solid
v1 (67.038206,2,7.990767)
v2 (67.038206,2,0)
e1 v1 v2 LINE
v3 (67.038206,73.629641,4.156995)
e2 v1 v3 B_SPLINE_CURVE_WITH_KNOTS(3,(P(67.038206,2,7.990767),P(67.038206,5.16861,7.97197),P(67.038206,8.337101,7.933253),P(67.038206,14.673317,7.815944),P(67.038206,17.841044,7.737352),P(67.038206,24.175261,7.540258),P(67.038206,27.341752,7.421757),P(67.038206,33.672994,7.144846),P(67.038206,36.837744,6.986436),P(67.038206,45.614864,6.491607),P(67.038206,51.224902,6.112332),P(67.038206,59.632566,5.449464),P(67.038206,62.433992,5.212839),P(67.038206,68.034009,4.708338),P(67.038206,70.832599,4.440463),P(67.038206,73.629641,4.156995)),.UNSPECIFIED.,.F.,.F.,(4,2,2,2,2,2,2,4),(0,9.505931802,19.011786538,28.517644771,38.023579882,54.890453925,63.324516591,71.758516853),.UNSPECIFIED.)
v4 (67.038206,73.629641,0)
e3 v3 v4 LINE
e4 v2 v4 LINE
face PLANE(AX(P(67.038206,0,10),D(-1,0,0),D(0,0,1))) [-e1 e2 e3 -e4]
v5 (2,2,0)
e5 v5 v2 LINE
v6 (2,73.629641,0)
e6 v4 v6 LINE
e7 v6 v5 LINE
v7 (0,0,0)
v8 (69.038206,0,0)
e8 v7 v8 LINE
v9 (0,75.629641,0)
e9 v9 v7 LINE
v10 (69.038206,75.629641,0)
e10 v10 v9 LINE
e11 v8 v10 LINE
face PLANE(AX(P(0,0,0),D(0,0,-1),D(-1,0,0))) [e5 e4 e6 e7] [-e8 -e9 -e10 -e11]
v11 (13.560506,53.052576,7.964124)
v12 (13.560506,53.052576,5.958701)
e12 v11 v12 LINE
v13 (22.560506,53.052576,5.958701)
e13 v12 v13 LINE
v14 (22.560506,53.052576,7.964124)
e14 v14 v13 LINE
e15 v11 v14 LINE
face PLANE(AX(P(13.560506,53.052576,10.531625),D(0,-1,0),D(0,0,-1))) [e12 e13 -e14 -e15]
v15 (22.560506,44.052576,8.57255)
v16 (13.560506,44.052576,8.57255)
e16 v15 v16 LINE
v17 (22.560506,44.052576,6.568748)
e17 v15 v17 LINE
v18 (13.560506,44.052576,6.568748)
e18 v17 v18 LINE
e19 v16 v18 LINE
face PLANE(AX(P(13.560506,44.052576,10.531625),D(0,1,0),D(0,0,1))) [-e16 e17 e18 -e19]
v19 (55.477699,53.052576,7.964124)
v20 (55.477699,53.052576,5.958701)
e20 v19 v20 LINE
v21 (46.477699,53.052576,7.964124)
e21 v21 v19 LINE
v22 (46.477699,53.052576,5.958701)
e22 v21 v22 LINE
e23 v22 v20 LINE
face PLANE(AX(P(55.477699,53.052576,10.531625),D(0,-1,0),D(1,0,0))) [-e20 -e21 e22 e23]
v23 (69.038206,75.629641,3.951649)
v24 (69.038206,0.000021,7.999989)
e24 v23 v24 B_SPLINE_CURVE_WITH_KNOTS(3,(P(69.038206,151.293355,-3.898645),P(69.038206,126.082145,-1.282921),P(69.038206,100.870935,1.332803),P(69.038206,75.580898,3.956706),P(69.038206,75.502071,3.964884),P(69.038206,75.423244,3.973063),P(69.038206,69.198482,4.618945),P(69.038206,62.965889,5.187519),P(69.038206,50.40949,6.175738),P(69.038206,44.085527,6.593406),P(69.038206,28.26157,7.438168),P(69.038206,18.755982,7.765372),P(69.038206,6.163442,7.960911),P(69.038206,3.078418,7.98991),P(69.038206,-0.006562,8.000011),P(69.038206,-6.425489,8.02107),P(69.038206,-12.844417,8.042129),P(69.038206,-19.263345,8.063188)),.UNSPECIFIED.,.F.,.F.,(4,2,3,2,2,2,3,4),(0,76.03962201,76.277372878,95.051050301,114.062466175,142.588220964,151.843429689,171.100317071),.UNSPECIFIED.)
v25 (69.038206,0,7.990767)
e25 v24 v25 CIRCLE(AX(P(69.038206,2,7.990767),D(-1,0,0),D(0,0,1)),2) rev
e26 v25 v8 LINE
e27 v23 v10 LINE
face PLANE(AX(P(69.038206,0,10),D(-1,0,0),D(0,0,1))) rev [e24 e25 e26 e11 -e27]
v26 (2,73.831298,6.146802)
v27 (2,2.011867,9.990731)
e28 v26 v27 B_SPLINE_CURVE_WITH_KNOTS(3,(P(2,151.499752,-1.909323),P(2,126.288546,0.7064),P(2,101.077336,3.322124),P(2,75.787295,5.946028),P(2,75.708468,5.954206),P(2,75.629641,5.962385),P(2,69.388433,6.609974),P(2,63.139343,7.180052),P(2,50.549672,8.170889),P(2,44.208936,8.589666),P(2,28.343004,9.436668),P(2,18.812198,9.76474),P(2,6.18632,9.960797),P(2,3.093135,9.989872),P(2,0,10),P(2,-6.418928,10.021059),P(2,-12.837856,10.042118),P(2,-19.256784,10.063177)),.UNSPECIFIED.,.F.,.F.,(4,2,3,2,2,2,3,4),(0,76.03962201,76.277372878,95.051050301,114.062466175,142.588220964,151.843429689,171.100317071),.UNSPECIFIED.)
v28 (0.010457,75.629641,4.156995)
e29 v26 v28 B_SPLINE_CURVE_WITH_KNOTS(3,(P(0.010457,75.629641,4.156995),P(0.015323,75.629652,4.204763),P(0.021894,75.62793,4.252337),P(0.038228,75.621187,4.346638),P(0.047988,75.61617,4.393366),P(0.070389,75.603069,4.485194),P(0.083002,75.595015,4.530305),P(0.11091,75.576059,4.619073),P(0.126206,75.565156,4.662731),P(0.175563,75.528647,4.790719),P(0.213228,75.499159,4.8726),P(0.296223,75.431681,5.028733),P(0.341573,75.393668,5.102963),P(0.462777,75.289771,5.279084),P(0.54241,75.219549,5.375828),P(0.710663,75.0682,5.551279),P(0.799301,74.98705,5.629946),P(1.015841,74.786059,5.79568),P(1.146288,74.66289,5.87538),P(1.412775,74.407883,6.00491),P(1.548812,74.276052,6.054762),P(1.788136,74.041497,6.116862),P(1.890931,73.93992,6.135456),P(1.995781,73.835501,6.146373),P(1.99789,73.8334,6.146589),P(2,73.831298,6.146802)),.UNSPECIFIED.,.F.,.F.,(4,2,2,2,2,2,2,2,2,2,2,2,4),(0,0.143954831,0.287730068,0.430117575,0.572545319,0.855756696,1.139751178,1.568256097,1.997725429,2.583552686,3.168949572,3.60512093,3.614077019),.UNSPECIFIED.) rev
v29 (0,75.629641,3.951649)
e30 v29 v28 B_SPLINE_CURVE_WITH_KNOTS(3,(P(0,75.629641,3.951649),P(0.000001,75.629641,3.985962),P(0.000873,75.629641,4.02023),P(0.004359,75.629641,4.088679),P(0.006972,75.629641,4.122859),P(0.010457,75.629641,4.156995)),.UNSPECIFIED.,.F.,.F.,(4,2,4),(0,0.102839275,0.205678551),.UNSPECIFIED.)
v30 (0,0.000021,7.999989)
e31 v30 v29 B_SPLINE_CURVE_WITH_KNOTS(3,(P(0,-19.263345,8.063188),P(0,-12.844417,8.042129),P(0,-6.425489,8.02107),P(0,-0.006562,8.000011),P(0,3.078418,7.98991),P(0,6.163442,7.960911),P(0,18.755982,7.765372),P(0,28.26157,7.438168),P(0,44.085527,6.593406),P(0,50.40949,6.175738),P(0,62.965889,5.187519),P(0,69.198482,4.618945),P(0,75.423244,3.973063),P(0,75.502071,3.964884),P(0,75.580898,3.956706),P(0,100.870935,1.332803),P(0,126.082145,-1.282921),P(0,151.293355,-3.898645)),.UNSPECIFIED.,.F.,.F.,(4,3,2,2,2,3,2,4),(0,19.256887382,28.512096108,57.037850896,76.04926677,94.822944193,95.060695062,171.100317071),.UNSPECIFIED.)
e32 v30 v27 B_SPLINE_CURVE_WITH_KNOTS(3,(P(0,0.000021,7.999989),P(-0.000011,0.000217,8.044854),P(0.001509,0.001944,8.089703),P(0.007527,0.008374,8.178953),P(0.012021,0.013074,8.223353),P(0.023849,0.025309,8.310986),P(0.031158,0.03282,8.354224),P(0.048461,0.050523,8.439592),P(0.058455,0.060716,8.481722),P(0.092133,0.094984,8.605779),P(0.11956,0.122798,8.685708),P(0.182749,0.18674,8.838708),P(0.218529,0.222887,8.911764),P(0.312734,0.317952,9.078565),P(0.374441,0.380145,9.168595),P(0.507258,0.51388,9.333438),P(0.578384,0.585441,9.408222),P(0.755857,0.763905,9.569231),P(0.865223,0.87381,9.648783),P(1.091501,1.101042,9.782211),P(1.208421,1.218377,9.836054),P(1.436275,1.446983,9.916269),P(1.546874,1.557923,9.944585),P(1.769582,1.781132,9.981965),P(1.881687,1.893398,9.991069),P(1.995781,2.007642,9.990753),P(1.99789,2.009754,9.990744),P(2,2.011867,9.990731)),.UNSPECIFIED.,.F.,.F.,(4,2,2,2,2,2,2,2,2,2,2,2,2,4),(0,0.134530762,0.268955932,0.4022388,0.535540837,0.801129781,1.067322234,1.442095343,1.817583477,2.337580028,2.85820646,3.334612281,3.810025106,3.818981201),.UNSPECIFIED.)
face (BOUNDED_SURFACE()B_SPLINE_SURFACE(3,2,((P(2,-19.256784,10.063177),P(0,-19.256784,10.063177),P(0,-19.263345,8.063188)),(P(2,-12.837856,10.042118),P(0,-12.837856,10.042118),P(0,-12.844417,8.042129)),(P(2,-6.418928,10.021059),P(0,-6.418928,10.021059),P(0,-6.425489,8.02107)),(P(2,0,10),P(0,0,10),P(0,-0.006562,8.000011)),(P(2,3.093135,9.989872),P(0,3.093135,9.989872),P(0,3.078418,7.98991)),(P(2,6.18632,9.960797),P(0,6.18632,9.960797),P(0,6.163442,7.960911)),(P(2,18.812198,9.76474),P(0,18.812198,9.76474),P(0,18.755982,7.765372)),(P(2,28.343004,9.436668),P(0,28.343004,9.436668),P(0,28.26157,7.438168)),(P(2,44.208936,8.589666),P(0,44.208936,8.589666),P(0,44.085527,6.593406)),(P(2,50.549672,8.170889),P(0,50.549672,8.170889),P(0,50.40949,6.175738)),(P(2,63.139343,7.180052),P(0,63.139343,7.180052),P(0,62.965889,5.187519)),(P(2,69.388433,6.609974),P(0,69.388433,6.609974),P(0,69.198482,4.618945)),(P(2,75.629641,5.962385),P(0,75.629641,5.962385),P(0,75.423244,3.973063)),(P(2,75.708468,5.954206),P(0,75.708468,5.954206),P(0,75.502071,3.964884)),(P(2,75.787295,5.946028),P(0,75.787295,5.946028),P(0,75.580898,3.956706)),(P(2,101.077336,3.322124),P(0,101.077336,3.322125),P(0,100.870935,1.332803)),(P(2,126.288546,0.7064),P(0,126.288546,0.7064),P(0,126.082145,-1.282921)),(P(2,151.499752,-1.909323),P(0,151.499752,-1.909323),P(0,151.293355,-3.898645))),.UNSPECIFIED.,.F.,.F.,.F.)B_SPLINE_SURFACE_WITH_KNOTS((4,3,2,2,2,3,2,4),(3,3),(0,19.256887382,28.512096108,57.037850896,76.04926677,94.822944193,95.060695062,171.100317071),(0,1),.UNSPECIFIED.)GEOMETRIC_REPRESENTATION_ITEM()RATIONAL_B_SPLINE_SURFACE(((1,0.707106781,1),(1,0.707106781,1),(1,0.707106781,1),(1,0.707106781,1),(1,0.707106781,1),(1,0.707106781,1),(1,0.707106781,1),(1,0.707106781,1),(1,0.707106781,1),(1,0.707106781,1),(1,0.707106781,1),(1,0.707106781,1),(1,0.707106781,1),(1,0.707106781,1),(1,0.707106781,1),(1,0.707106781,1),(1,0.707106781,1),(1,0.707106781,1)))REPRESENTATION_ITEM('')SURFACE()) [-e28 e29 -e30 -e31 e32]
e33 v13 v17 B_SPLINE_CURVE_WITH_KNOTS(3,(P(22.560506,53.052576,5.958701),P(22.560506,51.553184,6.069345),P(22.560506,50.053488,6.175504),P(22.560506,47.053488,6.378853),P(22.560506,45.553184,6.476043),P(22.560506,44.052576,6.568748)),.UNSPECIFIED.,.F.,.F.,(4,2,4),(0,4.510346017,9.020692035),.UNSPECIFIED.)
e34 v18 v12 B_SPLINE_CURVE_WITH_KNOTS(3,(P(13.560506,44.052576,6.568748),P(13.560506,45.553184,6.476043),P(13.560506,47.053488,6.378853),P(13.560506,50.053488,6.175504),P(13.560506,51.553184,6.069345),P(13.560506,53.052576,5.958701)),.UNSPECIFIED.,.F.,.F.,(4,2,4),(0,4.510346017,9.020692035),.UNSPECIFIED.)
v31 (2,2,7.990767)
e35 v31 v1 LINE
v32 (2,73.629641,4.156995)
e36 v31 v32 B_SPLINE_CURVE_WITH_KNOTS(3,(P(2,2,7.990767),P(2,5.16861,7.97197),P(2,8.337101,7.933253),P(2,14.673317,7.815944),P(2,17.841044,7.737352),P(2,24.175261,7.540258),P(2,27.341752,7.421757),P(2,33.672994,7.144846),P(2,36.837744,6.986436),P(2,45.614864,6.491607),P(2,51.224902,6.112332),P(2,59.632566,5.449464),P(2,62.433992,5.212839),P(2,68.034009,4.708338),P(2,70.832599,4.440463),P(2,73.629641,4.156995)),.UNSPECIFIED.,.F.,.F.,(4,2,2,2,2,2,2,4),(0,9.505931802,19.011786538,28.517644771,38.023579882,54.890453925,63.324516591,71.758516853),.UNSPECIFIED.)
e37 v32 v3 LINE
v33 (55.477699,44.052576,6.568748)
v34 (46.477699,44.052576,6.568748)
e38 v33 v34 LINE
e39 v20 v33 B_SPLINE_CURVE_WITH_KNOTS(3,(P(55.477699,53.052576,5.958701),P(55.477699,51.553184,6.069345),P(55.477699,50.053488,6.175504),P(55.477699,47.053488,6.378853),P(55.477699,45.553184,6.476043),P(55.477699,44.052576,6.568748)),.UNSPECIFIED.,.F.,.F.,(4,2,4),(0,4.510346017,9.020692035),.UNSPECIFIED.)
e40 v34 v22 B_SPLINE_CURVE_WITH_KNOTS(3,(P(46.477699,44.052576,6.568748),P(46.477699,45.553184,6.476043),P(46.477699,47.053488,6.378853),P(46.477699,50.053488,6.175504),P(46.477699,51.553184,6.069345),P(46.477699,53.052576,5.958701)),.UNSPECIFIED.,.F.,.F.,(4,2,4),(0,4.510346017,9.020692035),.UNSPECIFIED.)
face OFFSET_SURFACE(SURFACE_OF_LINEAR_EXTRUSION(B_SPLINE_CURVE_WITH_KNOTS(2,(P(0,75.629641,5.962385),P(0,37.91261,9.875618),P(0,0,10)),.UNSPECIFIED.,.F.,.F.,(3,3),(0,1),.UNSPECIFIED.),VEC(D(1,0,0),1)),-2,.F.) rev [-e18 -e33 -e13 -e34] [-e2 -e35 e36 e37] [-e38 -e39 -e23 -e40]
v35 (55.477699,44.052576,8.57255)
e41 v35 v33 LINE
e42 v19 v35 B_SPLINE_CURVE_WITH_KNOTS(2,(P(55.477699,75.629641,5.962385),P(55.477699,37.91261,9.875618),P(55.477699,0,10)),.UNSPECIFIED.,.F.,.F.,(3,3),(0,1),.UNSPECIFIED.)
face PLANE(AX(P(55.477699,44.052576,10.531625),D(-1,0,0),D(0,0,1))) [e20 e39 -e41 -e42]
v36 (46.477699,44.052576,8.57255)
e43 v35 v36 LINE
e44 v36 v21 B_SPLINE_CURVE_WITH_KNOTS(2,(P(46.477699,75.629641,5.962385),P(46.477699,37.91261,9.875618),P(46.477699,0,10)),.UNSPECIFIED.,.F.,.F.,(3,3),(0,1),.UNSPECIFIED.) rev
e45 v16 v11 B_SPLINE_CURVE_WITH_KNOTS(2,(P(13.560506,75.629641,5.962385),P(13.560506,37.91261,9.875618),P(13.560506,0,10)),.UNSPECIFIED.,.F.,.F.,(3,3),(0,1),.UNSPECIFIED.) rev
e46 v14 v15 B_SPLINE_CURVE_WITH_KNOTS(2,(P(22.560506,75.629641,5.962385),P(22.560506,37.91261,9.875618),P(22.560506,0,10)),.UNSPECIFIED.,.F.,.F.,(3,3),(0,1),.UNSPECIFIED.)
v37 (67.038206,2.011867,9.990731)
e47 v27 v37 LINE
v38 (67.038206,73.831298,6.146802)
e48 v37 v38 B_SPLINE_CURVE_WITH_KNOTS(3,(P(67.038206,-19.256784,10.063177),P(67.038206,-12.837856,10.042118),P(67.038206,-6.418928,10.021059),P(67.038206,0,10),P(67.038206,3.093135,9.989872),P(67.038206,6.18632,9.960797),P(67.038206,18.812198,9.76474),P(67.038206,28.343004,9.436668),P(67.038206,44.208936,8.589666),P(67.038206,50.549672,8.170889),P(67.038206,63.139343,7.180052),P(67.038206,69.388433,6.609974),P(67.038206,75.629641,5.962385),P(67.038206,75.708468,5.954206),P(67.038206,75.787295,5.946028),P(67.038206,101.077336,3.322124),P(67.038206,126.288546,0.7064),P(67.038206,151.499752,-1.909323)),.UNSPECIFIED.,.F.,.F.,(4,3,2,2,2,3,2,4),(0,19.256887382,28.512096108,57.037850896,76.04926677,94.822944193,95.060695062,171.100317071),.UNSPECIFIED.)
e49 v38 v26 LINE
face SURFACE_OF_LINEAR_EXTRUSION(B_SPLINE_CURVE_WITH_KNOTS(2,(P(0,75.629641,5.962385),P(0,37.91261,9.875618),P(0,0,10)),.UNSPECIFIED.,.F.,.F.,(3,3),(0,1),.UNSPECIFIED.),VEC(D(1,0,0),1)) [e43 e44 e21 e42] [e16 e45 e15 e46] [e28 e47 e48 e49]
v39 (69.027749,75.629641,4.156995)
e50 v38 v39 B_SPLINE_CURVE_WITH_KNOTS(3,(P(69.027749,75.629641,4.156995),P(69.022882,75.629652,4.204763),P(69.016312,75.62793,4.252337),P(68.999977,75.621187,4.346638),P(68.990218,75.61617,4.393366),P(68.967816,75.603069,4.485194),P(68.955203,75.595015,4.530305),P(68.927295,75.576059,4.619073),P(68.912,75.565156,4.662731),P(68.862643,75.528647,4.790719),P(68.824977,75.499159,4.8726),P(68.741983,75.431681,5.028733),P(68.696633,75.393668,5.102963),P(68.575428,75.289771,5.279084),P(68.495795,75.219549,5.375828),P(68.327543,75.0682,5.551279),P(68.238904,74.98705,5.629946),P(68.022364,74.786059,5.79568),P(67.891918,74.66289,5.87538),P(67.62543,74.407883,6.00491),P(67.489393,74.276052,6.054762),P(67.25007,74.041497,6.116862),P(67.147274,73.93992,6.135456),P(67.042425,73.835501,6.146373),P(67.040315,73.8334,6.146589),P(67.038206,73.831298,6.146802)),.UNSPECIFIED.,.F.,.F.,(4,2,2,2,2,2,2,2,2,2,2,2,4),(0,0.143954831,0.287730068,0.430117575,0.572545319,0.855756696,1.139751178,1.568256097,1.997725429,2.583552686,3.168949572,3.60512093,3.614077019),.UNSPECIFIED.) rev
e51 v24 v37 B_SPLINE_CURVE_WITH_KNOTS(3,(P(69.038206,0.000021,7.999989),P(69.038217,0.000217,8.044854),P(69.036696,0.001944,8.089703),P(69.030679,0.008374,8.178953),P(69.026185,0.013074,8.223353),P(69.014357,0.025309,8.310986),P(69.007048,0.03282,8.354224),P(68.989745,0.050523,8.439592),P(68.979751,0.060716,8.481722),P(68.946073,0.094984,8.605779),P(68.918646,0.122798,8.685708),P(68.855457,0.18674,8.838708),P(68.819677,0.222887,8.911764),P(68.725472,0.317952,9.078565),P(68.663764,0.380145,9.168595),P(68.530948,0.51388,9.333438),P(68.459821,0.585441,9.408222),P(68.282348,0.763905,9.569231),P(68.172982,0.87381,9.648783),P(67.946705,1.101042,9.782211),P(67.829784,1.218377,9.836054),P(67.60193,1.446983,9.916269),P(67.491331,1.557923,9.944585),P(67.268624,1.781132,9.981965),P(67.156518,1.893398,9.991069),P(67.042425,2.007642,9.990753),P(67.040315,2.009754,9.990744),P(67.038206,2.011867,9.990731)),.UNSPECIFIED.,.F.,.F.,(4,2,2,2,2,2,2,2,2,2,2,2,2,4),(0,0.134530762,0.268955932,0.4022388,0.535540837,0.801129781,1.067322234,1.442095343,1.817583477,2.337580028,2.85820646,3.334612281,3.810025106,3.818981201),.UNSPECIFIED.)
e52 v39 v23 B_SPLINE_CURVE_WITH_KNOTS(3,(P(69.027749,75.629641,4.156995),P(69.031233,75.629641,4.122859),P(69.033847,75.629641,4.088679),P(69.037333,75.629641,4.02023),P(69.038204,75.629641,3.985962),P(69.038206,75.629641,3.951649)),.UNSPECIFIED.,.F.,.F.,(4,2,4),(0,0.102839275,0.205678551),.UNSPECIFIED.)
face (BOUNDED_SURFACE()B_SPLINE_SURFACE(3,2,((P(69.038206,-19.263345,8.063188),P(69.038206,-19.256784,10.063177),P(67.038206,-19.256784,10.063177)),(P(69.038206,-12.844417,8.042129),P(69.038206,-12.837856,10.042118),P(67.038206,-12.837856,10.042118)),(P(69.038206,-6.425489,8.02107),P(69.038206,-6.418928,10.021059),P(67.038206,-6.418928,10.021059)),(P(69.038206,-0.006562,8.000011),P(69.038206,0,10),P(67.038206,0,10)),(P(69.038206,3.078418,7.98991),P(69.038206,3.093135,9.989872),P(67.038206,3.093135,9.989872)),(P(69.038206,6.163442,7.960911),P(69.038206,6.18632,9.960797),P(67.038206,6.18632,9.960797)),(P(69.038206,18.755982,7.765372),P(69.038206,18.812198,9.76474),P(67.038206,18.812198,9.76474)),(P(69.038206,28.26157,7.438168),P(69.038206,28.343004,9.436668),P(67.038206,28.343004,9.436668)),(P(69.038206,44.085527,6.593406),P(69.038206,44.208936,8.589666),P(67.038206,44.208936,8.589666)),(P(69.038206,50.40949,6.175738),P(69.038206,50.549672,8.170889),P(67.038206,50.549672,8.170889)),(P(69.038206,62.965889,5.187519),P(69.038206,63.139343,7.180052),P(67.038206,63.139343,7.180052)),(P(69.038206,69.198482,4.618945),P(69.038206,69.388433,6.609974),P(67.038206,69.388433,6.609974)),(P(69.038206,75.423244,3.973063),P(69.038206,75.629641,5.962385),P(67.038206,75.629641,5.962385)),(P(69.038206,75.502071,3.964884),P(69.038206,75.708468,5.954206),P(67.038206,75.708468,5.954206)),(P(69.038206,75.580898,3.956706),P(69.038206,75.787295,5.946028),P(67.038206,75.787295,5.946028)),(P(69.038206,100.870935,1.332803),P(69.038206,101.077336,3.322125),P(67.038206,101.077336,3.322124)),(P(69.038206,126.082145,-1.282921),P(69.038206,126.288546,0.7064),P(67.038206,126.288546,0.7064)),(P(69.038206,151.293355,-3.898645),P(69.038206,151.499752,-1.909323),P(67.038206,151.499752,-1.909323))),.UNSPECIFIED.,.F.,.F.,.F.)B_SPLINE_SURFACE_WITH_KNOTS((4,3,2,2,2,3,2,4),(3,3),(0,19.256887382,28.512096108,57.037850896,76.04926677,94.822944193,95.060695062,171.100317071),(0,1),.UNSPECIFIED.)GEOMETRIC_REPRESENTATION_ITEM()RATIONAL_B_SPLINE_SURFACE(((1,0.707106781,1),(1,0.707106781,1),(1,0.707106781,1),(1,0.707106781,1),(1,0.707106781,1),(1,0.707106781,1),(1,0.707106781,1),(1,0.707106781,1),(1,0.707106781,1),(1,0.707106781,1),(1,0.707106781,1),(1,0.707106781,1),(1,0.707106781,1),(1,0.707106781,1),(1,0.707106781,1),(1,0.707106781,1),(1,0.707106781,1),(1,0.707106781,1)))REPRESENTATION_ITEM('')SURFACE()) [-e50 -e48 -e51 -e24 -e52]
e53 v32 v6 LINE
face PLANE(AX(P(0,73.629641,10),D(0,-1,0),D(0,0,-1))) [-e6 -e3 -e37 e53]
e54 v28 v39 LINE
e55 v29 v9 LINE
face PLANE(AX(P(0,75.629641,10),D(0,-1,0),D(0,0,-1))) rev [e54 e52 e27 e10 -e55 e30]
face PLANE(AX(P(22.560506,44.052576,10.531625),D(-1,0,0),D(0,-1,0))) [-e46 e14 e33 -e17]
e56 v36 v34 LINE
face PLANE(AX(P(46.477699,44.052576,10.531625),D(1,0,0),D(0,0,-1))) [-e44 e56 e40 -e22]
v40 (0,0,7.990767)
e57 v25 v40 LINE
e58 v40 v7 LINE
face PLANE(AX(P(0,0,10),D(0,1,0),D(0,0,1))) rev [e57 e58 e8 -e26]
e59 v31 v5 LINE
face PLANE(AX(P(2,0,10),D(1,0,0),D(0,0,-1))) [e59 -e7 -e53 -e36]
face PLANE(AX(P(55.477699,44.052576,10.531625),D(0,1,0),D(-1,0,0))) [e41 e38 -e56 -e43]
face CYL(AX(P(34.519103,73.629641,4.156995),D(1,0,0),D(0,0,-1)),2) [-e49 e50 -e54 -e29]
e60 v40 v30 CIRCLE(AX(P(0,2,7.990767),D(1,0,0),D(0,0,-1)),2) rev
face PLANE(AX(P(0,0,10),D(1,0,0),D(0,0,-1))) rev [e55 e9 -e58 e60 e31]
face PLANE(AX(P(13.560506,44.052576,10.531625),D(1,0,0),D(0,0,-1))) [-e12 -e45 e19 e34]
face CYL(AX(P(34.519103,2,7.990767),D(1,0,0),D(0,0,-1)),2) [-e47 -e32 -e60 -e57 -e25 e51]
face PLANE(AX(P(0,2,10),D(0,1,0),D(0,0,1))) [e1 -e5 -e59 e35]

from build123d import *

# Parameters (mm, degrees)
SKETCH_1_W          = 69.038205547
SKETCH_1_H          = 75.629640719
EXTRUDE_1_DEPTH     = 10
CUT_EXTRUDE_1_DEPTH = 103.8888545
FILLET_1_R          = 2
SHELL_START         = 2
SHELL_1_DEPTH       = 65.038205547
SKETCH_3_W          = 9
SKETCH_3_H          = 9
CUT_EXTRUDE_2_DEPTH = 103.887957646


# Read off the part's stored shape, not the designer's step: 쉘1
with BuildPart() as part:
    # 스케치1 → 보스-돌출1 (new body)
    with BuildSketch(Plane.XY):
        with Locations((34.519102774, 37.81482036)):
            Rectangle(SKETCH_1_W, SKETCH_1_H)
    extrude(amount=EXTRUDE_1_DEPTH)

    # 스케치2 → 컷-돌출1 (cut, through all)
    with BuildSketch(Plane(origin=(69.038205547, 0, 0), x_dir=(0, 0, -1), z_dir=(1, 0, 0))):
        with BuildLine():
            Line((-10, 75.629640719), (-10, 0))
            add(Edge.make_bspline(
                [(-5.96238454, 75.629640719), (-9.875617916, 37.91260995), (-10, 0)],
                knots=[0, 0, 0, 1, 1, 1], degree=2))
            Line((-5.96238454, 75.629640719), (-10, 75.629640719))
        make_face()
    extrude(amount=-CUT_EXTRUDE_1_DEPTH, mode=Mode.SUBTRACT)

    # 필렛1
    fillet_1_edges = [part.edges().sort_by_distance(p)[0] for p in [
        (69.038205547, 37.865383105, 8.928316045),
        (34.519102774, 75.629640719, 5.96238454),
        (0, 37.865383105, 8.928316045),
        (34.519102774, 0, 10),
    ]]
    fillet(fillet_1_edges, radius=FILLET_1_R)

    # 쉘1 outline → 쉘1 (cut)
    with BuildSketch(Plane.YZ.offset(SHELL_START)):
        with BuildLine():
            Line((73.629640719, 0), (73.62964072, 4.156994713))
            add(Edge.make_bspline(
                [(73.62964072, 4.156994713), (55.766087317, 5.967380338), (37.873438197, 7.209785835), (19.951481081, 7.884254009), (1.999999998, 7.9907666)],
                knots=[0.023838454, 0.023838454, 0.023838454, 0.023838454, 0.023838454, 0.973465237, 0.973465237, 0.973465237, 0.973465237, 0.973465237], degree=4))
            Line((1.999999998, 7.9907666), (2, 0))
            Line((2, 0), (73.629640719, 0))
        make_face()
    extrude(amount=SHELL_1_DEPTH, mode=Mode.SUBTRACT)

    # 스케치3 → 컷-돌출2 (cut, through all)
    with BuildSketch(Plane.XY):
        with Locations((18.060506117, 48.552575582)):
            Rectangle(SKETCH_3_W, SKETCH_3_H)
        with Locations((50.97769943, 48.552575582)):
            Rectangle(SKETCH_3_W, SKETCH_3_H)
    extrude(amount=CUT_EXTRUDE_2_DEPTH, mode=Mode.SUBTRACT)


solid = part.part
